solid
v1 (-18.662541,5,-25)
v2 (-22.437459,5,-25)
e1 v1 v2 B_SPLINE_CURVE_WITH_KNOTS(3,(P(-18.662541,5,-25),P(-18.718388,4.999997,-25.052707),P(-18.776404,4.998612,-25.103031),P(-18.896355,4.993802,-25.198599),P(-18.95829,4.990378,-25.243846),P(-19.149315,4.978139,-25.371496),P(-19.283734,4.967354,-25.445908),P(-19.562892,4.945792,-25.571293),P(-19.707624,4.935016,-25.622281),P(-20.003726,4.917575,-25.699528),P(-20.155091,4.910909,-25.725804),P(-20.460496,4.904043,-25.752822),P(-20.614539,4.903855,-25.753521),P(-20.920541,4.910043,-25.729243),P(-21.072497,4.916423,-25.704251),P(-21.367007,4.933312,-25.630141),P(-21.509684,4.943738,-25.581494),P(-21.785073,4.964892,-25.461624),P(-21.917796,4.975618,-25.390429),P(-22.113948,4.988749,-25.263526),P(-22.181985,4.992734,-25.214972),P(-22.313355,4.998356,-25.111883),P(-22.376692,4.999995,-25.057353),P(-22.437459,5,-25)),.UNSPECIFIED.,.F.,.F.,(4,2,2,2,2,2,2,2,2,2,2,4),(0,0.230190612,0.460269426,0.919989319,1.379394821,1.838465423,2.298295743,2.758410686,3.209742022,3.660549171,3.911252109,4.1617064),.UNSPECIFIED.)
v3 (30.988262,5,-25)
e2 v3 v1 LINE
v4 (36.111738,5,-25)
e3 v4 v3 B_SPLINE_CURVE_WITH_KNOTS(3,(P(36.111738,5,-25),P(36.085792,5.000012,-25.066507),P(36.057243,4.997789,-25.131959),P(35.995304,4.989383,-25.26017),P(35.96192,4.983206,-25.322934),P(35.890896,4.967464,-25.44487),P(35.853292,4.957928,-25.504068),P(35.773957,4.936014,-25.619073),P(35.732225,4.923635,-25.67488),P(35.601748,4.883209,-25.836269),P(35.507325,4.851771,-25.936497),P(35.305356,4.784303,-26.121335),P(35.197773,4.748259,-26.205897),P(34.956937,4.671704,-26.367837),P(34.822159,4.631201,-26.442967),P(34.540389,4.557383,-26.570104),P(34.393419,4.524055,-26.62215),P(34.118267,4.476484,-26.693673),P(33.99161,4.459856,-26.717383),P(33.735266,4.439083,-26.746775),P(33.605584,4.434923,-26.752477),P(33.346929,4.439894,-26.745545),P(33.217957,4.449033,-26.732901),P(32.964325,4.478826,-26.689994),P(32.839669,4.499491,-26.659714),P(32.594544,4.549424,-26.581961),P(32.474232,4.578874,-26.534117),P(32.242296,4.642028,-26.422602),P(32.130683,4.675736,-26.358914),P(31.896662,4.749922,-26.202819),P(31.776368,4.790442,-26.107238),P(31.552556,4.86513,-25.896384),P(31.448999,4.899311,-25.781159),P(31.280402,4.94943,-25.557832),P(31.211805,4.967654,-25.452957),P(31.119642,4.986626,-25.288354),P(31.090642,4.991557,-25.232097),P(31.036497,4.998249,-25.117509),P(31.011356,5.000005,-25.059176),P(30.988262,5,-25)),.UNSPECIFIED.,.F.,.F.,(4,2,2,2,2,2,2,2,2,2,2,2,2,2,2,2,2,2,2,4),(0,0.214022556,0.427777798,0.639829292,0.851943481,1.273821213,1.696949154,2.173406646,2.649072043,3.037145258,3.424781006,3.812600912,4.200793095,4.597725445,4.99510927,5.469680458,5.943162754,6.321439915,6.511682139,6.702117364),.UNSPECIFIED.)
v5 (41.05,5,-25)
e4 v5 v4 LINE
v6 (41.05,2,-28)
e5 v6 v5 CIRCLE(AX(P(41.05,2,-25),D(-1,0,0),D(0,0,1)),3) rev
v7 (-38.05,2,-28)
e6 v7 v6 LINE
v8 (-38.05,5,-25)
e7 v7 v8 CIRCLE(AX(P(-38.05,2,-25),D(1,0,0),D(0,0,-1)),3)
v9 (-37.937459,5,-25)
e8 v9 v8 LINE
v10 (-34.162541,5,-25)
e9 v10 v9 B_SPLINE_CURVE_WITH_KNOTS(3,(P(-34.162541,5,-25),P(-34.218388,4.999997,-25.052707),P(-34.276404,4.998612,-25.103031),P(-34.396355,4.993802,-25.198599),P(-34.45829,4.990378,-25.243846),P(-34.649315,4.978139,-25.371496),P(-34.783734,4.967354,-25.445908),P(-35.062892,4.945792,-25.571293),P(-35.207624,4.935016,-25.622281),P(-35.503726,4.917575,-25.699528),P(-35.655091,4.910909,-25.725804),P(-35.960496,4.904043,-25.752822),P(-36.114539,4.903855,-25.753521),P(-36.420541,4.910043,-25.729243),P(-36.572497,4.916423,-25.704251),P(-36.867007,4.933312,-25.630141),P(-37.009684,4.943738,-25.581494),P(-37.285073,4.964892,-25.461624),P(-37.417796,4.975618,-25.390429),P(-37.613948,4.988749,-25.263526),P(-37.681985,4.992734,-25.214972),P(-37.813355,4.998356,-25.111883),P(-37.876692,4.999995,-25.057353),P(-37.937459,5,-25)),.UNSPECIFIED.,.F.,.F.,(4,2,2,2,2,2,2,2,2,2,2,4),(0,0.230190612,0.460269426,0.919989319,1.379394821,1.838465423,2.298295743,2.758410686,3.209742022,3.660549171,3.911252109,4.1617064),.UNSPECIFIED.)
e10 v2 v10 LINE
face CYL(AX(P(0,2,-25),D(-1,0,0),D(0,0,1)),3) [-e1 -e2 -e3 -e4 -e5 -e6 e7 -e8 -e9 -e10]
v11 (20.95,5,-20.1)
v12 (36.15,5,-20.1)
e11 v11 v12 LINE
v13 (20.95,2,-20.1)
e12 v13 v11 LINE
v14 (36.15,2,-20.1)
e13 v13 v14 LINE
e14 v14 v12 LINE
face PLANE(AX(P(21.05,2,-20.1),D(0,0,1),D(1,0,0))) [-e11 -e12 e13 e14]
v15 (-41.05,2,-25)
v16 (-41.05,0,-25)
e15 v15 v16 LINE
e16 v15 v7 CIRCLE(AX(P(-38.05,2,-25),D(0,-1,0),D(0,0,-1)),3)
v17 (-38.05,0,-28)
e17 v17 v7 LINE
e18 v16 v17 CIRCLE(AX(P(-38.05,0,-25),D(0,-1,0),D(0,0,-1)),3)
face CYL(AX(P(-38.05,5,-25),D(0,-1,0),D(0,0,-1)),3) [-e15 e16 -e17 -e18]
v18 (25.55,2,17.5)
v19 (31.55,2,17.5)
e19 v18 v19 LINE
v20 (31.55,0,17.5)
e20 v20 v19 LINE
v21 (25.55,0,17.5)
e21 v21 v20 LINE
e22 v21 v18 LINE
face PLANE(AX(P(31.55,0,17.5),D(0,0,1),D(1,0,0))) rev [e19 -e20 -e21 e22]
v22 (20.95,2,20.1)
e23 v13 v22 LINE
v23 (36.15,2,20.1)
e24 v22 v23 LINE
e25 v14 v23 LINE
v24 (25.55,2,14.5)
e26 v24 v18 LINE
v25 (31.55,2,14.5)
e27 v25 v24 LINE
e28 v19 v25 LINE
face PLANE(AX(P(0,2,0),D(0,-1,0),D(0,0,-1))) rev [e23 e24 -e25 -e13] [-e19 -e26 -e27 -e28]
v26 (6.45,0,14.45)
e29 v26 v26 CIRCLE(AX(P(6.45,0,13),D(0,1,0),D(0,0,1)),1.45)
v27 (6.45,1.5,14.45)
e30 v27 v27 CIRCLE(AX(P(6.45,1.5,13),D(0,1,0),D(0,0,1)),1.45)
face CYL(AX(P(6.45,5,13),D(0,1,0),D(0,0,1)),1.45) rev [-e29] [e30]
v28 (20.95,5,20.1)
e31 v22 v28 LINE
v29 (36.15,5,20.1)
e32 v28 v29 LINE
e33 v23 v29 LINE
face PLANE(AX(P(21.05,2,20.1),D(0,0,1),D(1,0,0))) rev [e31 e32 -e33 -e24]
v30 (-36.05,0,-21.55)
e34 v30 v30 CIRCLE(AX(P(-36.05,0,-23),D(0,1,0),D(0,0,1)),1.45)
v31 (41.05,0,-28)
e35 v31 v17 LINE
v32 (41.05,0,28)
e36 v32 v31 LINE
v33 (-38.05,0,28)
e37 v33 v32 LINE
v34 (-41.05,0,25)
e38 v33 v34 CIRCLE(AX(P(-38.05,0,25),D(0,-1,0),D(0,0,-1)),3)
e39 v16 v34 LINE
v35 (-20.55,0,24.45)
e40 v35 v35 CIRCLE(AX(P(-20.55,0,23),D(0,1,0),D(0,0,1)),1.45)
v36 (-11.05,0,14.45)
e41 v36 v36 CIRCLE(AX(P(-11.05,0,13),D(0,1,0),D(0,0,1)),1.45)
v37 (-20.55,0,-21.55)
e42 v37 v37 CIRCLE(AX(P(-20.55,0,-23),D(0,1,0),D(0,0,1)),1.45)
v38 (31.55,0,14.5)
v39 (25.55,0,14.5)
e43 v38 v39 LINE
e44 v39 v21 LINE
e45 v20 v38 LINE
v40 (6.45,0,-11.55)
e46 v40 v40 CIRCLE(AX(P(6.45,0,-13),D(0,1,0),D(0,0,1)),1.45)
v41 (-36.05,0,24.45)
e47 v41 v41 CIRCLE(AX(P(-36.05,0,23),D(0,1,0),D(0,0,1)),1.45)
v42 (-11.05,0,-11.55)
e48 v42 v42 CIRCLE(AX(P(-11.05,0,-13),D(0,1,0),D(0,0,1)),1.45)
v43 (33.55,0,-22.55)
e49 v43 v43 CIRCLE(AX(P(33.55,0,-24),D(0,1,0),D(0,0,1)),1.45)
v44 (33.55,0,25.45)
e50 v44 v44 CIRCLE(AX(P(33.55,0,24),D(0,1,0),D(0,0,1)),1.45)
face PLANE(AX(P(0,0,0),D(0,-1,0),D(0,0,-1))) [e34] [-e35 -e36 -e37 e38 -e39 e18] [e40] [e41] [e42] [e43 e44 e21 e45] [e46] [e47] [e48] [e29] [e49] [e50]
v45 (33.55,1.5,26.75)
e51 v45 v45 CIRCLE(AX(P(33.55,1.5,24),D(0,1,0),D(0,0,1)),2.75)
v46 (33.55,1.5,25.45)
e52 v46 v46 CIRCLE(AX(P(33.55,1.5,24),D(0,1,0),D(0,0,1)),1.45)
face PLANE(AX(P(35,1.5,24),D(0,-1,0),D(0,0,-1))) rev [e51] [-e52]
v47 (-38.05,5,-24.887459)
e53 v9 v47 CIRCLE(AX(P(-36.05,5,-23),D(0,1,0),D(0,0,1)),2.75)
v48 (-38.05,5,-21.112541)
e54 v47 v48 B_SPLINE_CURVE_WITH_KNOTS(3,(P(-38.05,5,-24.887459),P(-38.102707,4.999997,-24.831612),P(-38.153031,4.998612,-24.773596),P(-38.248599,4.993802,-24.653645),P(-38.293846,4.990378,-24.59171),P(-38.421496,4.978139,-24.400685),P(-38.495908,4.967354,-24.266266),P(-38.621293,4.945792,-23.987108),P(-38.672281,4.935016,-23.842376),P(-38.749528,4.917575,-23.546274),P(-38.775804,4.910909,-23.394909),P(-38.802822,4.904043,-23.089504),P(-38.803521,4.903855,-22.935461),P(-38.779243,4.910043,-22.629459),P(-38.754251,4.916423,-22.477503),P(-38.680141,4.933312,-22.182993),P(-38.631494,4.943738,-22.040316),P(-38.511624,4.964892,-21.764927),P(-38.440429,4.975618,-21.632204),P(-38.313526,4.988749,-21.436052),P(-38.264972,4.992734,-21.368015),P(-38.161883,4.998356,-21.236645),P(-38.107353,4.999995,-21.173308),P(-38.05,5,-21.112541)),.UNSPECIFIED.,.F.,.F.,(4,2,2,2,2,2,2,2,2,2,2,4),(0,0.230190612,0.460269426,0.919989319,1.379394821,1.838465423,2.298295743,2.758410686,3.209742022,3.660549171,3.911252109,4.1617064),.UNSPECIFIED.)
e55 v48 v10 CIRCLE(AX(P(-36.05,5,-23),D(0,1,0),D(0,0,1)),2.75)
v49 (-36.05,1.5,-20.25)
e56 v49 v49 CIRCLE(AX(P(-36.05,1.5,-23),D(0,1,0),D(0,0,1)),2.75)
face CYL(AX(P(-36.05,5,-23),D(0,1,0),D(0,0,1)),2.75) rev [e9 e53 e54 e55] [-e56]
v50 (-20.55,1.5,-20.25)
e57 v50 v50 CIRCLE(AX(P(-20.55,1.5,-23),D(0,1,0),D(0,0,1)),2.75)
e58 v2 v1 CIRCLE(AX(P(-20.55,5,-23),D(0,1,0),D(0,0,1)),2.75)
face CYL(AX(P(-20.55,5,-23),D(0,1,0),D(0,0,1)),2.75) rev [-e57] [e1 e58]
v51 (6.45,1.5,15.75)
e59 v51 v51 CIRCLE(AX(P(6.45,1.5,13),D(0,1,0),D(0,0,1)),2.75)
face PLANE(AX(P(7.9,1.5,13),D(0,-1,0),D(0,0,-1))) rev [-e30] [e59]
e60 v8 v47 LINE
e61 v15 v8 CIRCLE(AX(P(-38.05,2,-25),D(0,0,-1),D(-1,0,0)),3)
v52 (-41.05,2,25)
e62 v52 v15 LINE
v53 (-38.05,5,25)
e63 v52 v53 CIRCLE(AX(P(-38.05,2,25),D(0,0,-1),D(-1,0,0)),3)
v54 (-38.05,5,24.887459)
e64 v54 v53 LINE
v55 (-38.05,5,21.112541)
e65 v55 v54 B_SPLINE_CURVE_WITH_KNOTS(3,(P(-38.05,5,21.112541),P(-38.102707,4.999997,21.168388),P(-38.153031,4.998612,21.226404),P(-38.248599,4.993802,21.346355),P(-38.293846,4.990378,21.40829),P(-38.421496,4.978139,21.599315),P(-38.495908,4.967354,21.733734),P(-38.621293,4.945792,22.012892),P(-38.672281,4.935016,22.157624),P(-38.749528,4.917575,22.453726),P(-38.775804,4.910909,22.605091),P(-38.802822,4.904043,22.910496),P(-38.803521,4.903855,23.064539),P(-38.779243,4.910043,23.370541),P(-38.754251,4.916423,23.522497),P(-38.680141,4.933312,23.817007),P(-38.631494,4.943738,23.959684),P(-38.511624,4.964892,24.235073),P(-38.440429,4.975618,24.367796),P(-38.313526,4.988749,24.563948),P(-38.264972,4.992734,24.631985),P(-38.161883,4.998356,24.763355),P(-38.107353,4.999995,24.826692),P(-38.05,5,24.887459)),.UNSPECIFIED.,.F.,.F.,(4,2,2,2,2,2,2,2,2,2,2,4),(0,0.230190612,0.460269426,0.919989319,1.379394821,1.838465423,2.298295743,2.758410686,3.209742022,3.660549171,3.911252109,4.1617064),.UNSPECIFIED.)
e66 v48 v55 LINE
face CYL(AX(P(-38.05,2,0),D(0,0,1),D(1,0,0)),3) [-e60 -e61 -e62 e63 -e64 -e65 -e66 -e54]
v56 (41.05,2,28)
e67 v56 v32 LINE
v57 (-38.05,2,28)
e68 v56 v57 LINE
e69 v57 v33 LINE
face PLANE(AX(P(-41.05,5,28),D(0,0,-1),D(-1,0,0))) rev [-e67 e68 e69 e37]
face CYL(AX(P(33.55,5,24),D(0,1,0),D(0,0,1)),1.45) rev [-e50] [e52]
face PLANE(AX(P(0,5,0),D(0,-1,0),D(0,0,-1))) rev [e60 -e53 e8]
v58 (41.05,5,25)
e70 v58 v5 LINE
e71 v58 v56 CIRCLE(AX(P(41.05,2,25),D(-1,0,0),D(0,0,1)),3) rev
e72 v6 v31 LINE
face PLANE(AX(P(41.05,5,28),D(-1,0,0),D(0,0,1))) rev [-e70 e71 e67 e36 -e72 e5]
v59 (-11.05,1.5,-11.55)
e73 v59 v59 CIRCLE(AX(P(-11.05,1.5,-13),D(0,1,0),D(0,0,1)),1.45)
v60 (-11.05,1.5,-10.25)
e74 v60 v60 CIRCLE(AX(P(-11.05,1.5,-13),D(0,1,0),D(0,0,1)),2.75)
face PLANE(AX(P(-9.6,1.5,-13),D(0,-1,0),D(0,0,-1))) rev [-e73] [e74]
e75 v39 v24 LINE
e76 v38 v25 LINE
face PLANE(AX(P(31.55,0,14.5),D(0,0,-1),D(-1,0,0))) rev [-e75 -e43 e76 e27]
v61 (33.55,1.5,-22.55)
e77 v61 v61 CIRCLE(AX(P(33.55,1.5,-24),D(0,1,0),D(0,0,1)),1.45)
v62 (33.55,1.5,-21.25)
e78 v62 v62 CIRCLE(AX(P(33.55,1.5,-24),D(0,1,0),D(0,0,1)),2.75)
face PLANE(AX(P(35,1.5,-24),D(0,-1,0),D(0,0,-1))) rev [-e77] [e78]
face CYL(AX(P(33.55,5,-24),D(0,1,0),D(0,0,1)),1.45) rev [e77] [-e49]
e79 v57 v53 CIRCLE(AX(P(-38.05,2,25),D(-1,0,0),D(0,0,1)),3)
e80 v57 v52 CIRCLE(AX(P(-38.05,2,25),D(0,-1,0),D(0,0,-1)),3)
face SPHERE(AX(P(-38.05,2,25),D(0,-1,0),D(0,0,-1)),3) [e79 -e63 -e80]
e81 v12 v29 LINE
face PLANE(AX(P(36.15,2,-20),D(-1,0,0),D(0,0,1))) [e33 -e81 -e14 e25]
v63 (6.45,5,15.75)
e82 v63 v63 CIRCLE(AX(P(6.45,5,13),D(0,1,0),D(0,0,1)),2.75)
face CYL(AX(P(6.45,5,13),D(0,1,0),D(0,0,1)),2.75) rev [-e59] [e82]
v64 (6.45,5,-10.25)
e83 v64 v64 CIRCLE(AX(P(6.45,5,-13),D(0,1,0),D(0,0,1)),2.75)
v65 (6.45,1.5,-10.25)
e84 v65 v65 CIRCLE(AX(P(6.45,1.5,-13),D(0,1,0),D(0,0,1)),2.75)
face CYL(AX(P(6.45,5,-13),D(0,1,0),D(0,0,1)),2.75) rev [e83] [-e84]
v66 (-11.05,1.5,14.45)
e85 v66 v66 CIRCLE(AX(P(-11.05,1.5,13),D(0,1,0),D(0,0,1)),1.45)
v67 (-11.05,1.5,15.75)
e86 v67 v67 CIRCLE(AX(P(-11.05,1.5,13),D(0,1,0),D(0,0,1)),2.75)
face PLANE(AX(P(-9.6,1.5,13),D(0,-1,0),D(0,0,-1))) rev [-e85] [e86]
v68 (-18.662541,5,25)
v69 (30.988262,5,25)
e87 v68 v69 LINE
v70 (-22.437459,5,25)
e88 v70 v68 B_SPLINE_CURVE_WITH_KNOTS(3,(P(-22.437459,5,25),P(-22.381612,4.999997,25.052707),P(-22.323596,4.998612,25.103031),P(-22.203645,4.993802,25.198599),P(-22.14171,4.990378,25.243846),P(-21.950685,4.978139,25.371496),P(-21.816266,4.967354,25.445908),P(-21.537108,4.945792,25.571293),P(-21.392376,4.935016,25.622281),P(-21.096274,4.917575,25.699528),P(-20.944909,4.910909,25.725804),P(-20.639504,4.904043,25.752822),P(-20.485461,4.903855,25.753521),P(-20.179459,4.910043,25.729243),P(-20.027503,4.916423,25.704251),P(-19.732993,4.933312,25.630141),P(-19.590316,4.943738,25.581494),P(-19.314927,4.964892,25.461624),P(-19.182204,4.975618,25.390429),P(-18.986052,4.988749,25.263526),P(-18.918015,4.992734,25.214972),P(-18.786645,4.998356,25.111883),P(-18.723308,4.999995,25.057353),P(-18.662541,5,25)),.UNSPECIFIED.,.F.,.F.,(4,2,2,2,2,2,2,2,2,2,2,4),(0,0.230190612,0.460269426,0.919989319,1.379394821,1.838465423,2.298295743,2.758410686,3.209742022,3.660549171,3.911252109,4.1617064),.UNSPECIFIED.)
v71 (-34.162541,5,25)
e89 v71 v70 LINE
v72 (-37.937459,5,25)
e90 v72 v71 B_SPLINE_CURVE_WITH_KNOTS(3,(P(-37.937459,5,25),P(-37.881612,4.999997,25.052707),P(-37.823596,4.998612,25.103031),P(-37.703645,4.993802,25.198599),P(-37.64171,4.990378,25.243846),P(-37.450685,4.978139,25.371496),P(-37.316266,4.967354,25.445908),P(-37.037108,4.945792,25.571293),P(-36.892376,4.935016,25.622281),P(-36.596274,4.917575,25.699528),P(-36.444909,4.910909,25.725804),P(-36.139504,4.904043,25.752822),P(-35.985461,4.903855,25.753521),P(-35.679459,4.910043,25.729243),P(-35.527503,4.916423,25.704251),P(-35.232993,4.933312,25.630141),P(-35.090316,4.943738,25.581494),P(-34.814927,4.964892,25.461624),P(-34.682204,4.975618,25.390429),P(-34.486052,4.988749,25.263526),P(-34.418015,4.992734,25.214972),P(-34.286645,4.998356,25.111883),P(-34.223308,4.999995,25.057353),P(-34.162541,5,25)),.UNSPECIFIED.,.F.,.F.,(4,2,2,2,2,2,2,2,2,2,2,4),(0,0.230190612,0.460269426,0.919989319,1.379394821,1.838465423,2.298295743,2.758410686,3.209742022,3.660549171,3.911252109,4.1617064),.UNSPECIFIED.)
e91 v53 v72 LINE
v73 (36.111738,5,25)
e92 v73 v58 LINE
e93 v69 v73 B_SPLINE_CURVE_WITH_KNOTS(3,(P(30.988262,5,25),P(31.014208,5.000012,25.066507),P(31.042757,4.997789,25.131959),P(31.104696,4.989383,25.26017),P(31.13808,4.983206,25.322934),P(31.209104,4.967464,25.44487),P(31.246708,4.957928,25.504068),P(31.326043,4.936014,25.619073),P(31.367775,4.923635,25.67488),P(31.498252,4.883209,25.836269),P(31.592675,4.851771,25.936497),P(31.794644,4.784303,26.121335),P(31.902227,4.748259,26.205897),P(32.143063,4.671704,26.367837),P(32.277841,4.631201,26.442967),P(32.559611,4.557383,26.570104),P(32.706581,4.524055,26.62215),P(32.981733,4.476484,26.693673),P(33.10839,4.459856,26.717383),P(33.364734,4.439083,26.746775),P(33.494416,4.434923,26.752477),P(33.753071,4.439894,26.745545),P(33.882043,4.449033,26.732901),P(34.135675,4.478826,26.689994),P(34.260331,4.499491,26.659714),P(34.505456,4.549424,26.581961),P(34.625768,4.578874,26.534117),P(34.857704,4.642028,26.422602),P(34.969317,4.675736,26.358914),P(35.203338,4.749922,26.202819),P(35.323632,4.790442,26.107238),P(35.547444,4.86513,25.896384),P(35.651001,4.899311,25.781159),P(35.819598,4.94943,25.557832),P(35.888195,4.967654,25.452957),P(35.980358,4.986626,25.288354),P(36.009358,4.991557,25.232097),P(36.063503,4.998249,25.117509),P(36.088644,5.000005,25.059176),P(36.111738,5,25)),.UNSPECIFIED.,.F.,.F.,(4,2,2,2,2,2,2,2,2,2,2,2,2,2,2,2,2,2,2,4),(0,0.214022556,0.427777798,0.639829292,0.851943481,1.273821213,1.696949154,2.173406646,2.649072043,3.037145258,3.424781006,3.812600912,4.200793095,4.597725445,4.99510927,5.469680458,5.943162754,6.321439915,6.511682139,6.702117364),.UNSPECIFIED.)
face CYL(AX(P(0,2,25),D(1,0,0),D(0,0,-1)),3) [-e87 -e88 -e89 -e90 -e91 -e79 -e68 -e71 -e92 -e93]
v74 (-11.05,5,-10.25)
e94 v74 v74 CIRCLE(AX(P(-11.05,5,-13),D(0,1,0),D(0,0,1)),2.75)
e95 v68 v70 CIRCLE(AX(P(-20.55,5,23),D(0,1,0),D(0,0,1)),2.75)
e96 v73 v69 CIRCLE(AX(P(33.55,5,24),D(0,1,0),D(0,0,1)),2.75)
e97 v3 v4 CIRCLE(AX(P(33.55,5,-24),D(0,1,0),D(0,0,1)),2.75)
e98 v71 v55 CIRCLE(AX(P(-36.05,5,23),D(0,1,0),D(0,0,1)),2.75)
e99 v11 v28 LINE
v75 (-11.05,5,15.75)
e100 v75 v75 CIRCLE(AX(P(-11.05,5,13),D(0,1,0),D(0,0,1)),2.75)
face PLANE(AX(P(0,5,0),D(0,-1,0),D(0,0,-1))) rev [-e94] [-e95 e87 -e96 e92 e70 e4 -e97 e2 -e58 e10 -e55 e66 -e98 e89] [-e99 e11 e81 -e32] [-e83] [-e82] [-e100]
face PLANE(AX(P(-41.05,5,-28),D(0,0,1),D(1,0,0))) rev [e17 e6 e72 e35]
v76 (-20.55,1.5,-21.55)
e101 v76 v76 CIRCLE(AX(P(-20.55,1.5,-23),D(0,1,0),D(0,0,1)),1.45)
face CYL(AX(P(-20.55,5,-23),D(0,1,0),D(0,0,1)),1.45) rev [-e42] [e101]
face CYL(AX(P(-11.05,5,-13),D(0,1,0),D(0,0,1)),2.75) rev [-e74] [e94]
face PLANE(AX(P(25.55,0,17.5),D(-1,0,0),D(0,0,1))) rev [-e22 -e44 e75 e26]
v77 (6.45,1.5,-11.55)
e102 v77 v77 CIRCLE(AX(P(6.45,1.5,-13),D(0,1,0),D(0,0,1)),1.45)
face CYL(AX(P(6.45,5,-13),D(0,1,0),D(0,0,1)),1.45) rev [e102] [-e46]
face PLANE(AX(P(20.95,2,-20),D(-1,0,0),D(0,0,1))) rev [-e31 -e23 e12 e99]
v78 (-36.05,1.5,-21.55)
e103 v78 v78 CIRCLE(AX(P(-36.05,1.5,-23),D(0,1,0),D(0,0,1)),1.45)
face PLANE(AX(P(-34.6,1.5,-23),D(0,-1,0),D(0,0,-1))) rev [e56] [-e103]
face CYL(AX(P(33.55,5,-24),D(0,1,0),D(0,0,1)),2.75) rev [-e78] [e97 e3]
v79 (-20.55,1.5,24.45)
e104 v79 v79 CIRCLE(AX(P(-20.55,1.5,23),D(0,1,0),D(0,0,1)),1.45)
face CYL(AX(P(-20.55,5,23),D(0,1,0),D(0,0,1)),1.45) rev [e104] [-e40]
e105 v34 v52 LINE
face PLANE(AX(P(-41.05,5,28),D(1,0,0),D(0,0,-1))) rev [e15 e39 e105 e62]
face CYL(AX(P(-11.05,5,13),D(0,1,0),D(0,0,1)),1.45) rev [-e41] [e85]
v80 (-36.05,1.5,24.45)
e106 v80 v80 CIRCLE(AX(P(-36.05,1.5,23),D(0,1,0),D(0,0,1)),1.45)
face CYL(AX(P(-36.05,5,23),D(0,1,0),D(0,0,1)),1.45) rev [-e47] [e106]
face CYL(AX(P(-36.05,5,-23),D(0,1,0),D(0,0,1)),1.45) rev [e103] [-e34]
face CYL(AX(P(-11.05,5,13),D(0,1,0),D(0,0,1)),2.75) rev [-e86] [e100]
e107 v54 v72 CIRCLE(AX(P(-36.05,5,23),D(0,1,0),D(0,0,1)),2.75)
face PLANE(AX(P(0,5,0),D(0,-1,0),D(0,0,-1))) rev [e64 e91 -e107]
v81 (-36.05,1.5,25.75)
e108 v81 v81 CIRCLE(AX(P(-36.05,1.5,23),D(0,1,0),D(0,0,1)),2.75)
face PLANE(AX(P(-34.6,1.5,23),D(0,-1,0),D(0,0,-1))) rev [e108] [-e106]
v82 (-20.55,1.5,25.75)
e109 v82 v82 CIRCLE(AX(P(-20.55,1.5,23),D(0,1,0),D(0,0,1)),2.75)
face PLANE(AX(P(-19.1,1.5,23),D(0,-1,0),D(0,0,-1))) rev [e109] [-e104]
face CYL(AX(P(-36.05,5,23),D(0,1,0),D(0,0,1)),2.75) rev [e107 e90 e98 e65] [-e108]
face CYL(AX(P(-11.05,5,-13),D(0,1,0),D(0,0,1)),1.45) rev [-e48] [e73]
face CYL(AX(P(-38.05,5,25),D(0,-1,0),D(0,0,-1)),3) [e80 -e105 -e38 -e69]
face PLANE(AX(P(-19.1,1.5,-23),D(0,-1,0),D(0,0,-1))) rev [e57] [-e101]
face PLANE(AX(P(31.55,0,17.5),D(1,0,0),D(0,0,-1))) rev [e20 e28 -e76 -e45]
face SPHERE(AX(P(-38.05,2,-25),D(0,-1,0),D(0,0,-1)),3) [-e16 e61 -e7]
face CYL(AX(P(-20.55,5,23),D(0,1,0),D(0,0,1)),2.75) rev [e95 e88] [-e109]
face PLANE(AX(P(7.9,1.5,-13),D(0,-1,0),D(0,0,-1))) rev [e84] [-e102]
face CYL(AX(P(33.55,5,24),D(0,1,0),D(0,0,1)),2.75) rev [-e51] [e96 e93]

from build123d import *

# Parameters (mm, degrees)
SKETCH1_W                        = 82.1
SKETCH1_H                        = 56
BOSS_EXTRUDE1_DEPTH              = 5
CBORE_FOR_M2_5_SHCS1_D           = 2.9
CBORE_FOR_M2_5_SHCS1_CBORE_D     = 5.5
CBORE_FOR_M2_5_SHCS1_CBORE_DEPTH = 3.5
FILLET1_R                        = 3
FILLET2_R                        = 3
SKETCH4_W                        = 15
SKETCH4_H                        = 40
CUT_EXTRUDE1_DEPTH               = 3
SKETCH5_W                        = 6
SKETCH5_H                        = 3
CUT_EXTRUDE2_DEPTH               = 50.780543533
MOVE_FACE1_BY                    = 0.1
MOVE_FACE1_2_BY                  = 0.1
MOVE_FACE1_3_BY                  = 0.1
MOVE_FACE1_4_BY                  = 0.1


with BuildPart() as part:
    # Sketch1 → Boss-Extrude1 (new body)
    with BuildSketch(Plane(origin=(0, 0, 0), x_dir=(1, 0, 0), z_dir=(0, 1, 0))):
        Rectangle(SKETCH1_W, SKETCH1_H)
    extrude(amount=BOSS_EXTRUDE1_DEPTH)

    # CBORE for M2.5 SHCS1 (through all)
    with Locations(Plane(origin=(0, 5, 0), x_dir=(1, 0, 0), z_dir=(0, 1, 0))):
        with Locations((-36.05, 23), (-36.05, -23), (-20.55, -23), (-20.55, 23), (-11.05, -13), (-11.05, 13), (6.45, 13), (6.45, -13), (33.55, 24), (33.55, -24)):
            CounterBoreHole(CBORE_FOR_M2_5_SHCS1_D / 2, CBORE_FOR_M2_5_SHCS1_CBORE_D / 2, CBORE_FOR_M2_5_SHCS1_CBORE_DEPTH)

    # Fillet1
    fillet1_edges = [part.edges().sort_by_distance(p)[0] for p in [
        (-41.05, 2.5, 28),
        (-41.05, 2.5, -28),
    ]]
    fillet(fillet1_edges, radius=FILLET1_R)

    # Fillet2
    # the kernel refuses this fillet: 3 mm, written as the material it takes off along each edge
    with BuildSketch(Plane(origin=(-38.05, 5, 28), x_dir=(0, -1, 0), z_dir=(1, 0, 0))) as fillet2_piece_1:
        with BuildLine():
            CenterArc((FILLET2_R, FILLET2_R), FILLET2_R, 180, 90)
            Line((0, FILLET2_R), (0, 0))
            Line((0, 0), (FILLET2_R, 0))
        make_face()
    extrude(amount=86.6, mode=Mode.SUBTRACT)
    with BuildSketch(Plane(origin=(-38.05, 5, 25), x_dir=(0, 0, 1), z_dir=(1, 0, 0))) as fillet2_piece_2:
        with BuildLine():
            CenterArc((3 - FILLET2_R, FILLET2_R), FILLET2_R, 270, 90)
            Line((3 - FILLET2_R, 0), (3, 0))
            Line((3, 0), (3, FILLET2_R))
        make_face()
    revolve(axis=Axis((-38.05, 5, 25), (0, -1, 0)), revolution_arc=90, mode=Mode.SUBTRACT)
    with BuildSketch(Plane(origin=(-38.05, 5, -25), x_dir=(-1, 0, 0), z_dir=(0, 0, 1))) as fillet2_piece_3:
        with BuildLine():
            CenterArc((3 - FILLET2_R, FILLET2_R), FILLET2_R, 270, 90)
            Line((3, FILLET2_R), (3, 0))
            Line((3, 0), (3 - FILLET2_R, 0))
        make_face()
    revolve(axis=Axis((-38.05, 5, -25), (0, -1, 0)), revolution_arc=90, mode=Mode.SUBTRACT)
    with BuildSketch(Plane(origin=(48.55, 5, -28), x_dir=(0, 0, 1), z_dir=(-1, 0, 0))) as fillet2_piece_4:
        with BuildLine():
            CenterArc((FILLET2_R, -FILLET2_R), FILLET2_R, 90, 90)
            Line((0, -FILLET2_R), (0, 0))
            Line((0, 0), (FILLET2_R, 0))
        make_face()
    extrude(amount=86.6, mode=Mode.SUBTRACT)
    with BuildSketch(Plane(origin=(-41.05, 5, -25), x_dir=(1, 0, 0), z_dir=(0, 0, 1))) as fillet2_piece_5:
        with BuildLine():
            CenterArc((FILLET2_R, -FILLET2_R), FILLET2_R, 90, 90)
            Line((0, -FILLET2_R), (0, 0))
            Line((0, 0), (FILLET2_R, 0))
        make_face()
    extrude(amount=50, mode=Mode.SUBTRACT)

    # Sketch4 → Cut-Extrude1 (cut)
    with BuildSketch(Plane(origin=(0, 5, 0), x_dir=(1, 0, 0), z_dir=(0, 1, 0))):
        with Locations((28.55, 0)):
            Rectangle(SKETCH4_W, SKETCH4_H)
    extrude(amount=-CUT_EXTRUDE1_DEPTH, mode=Mode.SUBTRACT)

    # Sketch5 → Cut-Extrude2 (cut, through all)
    with BuildSketch(Plane(origin=(0, 2, 0), x_dir=(1, 0, 0), z_dir=(0, 1, 0))):
        with Locations((28.55, -16)):
            Rectangle(SKETCH5_W, SKETCH5_H)
    extrude(amount=-CUT_EXTRUDE2_DEPTH, mode=Mode.SUBTRACT)

    # Move Face1: a face moved inward by 0.1
    extrude(part.faces().sort_by_distance((28.55, 3.5, 20))[0], amount=MOVE_FACE1_BY, dir=(0, 0, 1), mode=Mode.SUBTRACT)

    # Move Face1 2: a face moved inward by 0.1
    extrude(part.faces().sort_by_distance((36.05, 3.5, 0))[0], amount=MOVE_FACE1_2_BY, dir=(1, 0, 0), mode=Mode.SUBTRACT)

    # Move Face1 3: a face moved inward by 0.1
    extrude(part.faces().sort_by_distance((28.55, 3.5, -20))[0], amount=MOVE_FACE1_3_BY, dir=(0, 0, -1), mode=Mode.SUBTRACT)

    # Move Face1 4: a face moved inward by 0.1
    extrude(part.faces().sort_by_distance((21.05, 3.5, 0))[0], amount=MOVE_FACE1_4_BY, dir=(-1, 0, 0), mode=Mode.SUBTRACT)


solid = part.part
